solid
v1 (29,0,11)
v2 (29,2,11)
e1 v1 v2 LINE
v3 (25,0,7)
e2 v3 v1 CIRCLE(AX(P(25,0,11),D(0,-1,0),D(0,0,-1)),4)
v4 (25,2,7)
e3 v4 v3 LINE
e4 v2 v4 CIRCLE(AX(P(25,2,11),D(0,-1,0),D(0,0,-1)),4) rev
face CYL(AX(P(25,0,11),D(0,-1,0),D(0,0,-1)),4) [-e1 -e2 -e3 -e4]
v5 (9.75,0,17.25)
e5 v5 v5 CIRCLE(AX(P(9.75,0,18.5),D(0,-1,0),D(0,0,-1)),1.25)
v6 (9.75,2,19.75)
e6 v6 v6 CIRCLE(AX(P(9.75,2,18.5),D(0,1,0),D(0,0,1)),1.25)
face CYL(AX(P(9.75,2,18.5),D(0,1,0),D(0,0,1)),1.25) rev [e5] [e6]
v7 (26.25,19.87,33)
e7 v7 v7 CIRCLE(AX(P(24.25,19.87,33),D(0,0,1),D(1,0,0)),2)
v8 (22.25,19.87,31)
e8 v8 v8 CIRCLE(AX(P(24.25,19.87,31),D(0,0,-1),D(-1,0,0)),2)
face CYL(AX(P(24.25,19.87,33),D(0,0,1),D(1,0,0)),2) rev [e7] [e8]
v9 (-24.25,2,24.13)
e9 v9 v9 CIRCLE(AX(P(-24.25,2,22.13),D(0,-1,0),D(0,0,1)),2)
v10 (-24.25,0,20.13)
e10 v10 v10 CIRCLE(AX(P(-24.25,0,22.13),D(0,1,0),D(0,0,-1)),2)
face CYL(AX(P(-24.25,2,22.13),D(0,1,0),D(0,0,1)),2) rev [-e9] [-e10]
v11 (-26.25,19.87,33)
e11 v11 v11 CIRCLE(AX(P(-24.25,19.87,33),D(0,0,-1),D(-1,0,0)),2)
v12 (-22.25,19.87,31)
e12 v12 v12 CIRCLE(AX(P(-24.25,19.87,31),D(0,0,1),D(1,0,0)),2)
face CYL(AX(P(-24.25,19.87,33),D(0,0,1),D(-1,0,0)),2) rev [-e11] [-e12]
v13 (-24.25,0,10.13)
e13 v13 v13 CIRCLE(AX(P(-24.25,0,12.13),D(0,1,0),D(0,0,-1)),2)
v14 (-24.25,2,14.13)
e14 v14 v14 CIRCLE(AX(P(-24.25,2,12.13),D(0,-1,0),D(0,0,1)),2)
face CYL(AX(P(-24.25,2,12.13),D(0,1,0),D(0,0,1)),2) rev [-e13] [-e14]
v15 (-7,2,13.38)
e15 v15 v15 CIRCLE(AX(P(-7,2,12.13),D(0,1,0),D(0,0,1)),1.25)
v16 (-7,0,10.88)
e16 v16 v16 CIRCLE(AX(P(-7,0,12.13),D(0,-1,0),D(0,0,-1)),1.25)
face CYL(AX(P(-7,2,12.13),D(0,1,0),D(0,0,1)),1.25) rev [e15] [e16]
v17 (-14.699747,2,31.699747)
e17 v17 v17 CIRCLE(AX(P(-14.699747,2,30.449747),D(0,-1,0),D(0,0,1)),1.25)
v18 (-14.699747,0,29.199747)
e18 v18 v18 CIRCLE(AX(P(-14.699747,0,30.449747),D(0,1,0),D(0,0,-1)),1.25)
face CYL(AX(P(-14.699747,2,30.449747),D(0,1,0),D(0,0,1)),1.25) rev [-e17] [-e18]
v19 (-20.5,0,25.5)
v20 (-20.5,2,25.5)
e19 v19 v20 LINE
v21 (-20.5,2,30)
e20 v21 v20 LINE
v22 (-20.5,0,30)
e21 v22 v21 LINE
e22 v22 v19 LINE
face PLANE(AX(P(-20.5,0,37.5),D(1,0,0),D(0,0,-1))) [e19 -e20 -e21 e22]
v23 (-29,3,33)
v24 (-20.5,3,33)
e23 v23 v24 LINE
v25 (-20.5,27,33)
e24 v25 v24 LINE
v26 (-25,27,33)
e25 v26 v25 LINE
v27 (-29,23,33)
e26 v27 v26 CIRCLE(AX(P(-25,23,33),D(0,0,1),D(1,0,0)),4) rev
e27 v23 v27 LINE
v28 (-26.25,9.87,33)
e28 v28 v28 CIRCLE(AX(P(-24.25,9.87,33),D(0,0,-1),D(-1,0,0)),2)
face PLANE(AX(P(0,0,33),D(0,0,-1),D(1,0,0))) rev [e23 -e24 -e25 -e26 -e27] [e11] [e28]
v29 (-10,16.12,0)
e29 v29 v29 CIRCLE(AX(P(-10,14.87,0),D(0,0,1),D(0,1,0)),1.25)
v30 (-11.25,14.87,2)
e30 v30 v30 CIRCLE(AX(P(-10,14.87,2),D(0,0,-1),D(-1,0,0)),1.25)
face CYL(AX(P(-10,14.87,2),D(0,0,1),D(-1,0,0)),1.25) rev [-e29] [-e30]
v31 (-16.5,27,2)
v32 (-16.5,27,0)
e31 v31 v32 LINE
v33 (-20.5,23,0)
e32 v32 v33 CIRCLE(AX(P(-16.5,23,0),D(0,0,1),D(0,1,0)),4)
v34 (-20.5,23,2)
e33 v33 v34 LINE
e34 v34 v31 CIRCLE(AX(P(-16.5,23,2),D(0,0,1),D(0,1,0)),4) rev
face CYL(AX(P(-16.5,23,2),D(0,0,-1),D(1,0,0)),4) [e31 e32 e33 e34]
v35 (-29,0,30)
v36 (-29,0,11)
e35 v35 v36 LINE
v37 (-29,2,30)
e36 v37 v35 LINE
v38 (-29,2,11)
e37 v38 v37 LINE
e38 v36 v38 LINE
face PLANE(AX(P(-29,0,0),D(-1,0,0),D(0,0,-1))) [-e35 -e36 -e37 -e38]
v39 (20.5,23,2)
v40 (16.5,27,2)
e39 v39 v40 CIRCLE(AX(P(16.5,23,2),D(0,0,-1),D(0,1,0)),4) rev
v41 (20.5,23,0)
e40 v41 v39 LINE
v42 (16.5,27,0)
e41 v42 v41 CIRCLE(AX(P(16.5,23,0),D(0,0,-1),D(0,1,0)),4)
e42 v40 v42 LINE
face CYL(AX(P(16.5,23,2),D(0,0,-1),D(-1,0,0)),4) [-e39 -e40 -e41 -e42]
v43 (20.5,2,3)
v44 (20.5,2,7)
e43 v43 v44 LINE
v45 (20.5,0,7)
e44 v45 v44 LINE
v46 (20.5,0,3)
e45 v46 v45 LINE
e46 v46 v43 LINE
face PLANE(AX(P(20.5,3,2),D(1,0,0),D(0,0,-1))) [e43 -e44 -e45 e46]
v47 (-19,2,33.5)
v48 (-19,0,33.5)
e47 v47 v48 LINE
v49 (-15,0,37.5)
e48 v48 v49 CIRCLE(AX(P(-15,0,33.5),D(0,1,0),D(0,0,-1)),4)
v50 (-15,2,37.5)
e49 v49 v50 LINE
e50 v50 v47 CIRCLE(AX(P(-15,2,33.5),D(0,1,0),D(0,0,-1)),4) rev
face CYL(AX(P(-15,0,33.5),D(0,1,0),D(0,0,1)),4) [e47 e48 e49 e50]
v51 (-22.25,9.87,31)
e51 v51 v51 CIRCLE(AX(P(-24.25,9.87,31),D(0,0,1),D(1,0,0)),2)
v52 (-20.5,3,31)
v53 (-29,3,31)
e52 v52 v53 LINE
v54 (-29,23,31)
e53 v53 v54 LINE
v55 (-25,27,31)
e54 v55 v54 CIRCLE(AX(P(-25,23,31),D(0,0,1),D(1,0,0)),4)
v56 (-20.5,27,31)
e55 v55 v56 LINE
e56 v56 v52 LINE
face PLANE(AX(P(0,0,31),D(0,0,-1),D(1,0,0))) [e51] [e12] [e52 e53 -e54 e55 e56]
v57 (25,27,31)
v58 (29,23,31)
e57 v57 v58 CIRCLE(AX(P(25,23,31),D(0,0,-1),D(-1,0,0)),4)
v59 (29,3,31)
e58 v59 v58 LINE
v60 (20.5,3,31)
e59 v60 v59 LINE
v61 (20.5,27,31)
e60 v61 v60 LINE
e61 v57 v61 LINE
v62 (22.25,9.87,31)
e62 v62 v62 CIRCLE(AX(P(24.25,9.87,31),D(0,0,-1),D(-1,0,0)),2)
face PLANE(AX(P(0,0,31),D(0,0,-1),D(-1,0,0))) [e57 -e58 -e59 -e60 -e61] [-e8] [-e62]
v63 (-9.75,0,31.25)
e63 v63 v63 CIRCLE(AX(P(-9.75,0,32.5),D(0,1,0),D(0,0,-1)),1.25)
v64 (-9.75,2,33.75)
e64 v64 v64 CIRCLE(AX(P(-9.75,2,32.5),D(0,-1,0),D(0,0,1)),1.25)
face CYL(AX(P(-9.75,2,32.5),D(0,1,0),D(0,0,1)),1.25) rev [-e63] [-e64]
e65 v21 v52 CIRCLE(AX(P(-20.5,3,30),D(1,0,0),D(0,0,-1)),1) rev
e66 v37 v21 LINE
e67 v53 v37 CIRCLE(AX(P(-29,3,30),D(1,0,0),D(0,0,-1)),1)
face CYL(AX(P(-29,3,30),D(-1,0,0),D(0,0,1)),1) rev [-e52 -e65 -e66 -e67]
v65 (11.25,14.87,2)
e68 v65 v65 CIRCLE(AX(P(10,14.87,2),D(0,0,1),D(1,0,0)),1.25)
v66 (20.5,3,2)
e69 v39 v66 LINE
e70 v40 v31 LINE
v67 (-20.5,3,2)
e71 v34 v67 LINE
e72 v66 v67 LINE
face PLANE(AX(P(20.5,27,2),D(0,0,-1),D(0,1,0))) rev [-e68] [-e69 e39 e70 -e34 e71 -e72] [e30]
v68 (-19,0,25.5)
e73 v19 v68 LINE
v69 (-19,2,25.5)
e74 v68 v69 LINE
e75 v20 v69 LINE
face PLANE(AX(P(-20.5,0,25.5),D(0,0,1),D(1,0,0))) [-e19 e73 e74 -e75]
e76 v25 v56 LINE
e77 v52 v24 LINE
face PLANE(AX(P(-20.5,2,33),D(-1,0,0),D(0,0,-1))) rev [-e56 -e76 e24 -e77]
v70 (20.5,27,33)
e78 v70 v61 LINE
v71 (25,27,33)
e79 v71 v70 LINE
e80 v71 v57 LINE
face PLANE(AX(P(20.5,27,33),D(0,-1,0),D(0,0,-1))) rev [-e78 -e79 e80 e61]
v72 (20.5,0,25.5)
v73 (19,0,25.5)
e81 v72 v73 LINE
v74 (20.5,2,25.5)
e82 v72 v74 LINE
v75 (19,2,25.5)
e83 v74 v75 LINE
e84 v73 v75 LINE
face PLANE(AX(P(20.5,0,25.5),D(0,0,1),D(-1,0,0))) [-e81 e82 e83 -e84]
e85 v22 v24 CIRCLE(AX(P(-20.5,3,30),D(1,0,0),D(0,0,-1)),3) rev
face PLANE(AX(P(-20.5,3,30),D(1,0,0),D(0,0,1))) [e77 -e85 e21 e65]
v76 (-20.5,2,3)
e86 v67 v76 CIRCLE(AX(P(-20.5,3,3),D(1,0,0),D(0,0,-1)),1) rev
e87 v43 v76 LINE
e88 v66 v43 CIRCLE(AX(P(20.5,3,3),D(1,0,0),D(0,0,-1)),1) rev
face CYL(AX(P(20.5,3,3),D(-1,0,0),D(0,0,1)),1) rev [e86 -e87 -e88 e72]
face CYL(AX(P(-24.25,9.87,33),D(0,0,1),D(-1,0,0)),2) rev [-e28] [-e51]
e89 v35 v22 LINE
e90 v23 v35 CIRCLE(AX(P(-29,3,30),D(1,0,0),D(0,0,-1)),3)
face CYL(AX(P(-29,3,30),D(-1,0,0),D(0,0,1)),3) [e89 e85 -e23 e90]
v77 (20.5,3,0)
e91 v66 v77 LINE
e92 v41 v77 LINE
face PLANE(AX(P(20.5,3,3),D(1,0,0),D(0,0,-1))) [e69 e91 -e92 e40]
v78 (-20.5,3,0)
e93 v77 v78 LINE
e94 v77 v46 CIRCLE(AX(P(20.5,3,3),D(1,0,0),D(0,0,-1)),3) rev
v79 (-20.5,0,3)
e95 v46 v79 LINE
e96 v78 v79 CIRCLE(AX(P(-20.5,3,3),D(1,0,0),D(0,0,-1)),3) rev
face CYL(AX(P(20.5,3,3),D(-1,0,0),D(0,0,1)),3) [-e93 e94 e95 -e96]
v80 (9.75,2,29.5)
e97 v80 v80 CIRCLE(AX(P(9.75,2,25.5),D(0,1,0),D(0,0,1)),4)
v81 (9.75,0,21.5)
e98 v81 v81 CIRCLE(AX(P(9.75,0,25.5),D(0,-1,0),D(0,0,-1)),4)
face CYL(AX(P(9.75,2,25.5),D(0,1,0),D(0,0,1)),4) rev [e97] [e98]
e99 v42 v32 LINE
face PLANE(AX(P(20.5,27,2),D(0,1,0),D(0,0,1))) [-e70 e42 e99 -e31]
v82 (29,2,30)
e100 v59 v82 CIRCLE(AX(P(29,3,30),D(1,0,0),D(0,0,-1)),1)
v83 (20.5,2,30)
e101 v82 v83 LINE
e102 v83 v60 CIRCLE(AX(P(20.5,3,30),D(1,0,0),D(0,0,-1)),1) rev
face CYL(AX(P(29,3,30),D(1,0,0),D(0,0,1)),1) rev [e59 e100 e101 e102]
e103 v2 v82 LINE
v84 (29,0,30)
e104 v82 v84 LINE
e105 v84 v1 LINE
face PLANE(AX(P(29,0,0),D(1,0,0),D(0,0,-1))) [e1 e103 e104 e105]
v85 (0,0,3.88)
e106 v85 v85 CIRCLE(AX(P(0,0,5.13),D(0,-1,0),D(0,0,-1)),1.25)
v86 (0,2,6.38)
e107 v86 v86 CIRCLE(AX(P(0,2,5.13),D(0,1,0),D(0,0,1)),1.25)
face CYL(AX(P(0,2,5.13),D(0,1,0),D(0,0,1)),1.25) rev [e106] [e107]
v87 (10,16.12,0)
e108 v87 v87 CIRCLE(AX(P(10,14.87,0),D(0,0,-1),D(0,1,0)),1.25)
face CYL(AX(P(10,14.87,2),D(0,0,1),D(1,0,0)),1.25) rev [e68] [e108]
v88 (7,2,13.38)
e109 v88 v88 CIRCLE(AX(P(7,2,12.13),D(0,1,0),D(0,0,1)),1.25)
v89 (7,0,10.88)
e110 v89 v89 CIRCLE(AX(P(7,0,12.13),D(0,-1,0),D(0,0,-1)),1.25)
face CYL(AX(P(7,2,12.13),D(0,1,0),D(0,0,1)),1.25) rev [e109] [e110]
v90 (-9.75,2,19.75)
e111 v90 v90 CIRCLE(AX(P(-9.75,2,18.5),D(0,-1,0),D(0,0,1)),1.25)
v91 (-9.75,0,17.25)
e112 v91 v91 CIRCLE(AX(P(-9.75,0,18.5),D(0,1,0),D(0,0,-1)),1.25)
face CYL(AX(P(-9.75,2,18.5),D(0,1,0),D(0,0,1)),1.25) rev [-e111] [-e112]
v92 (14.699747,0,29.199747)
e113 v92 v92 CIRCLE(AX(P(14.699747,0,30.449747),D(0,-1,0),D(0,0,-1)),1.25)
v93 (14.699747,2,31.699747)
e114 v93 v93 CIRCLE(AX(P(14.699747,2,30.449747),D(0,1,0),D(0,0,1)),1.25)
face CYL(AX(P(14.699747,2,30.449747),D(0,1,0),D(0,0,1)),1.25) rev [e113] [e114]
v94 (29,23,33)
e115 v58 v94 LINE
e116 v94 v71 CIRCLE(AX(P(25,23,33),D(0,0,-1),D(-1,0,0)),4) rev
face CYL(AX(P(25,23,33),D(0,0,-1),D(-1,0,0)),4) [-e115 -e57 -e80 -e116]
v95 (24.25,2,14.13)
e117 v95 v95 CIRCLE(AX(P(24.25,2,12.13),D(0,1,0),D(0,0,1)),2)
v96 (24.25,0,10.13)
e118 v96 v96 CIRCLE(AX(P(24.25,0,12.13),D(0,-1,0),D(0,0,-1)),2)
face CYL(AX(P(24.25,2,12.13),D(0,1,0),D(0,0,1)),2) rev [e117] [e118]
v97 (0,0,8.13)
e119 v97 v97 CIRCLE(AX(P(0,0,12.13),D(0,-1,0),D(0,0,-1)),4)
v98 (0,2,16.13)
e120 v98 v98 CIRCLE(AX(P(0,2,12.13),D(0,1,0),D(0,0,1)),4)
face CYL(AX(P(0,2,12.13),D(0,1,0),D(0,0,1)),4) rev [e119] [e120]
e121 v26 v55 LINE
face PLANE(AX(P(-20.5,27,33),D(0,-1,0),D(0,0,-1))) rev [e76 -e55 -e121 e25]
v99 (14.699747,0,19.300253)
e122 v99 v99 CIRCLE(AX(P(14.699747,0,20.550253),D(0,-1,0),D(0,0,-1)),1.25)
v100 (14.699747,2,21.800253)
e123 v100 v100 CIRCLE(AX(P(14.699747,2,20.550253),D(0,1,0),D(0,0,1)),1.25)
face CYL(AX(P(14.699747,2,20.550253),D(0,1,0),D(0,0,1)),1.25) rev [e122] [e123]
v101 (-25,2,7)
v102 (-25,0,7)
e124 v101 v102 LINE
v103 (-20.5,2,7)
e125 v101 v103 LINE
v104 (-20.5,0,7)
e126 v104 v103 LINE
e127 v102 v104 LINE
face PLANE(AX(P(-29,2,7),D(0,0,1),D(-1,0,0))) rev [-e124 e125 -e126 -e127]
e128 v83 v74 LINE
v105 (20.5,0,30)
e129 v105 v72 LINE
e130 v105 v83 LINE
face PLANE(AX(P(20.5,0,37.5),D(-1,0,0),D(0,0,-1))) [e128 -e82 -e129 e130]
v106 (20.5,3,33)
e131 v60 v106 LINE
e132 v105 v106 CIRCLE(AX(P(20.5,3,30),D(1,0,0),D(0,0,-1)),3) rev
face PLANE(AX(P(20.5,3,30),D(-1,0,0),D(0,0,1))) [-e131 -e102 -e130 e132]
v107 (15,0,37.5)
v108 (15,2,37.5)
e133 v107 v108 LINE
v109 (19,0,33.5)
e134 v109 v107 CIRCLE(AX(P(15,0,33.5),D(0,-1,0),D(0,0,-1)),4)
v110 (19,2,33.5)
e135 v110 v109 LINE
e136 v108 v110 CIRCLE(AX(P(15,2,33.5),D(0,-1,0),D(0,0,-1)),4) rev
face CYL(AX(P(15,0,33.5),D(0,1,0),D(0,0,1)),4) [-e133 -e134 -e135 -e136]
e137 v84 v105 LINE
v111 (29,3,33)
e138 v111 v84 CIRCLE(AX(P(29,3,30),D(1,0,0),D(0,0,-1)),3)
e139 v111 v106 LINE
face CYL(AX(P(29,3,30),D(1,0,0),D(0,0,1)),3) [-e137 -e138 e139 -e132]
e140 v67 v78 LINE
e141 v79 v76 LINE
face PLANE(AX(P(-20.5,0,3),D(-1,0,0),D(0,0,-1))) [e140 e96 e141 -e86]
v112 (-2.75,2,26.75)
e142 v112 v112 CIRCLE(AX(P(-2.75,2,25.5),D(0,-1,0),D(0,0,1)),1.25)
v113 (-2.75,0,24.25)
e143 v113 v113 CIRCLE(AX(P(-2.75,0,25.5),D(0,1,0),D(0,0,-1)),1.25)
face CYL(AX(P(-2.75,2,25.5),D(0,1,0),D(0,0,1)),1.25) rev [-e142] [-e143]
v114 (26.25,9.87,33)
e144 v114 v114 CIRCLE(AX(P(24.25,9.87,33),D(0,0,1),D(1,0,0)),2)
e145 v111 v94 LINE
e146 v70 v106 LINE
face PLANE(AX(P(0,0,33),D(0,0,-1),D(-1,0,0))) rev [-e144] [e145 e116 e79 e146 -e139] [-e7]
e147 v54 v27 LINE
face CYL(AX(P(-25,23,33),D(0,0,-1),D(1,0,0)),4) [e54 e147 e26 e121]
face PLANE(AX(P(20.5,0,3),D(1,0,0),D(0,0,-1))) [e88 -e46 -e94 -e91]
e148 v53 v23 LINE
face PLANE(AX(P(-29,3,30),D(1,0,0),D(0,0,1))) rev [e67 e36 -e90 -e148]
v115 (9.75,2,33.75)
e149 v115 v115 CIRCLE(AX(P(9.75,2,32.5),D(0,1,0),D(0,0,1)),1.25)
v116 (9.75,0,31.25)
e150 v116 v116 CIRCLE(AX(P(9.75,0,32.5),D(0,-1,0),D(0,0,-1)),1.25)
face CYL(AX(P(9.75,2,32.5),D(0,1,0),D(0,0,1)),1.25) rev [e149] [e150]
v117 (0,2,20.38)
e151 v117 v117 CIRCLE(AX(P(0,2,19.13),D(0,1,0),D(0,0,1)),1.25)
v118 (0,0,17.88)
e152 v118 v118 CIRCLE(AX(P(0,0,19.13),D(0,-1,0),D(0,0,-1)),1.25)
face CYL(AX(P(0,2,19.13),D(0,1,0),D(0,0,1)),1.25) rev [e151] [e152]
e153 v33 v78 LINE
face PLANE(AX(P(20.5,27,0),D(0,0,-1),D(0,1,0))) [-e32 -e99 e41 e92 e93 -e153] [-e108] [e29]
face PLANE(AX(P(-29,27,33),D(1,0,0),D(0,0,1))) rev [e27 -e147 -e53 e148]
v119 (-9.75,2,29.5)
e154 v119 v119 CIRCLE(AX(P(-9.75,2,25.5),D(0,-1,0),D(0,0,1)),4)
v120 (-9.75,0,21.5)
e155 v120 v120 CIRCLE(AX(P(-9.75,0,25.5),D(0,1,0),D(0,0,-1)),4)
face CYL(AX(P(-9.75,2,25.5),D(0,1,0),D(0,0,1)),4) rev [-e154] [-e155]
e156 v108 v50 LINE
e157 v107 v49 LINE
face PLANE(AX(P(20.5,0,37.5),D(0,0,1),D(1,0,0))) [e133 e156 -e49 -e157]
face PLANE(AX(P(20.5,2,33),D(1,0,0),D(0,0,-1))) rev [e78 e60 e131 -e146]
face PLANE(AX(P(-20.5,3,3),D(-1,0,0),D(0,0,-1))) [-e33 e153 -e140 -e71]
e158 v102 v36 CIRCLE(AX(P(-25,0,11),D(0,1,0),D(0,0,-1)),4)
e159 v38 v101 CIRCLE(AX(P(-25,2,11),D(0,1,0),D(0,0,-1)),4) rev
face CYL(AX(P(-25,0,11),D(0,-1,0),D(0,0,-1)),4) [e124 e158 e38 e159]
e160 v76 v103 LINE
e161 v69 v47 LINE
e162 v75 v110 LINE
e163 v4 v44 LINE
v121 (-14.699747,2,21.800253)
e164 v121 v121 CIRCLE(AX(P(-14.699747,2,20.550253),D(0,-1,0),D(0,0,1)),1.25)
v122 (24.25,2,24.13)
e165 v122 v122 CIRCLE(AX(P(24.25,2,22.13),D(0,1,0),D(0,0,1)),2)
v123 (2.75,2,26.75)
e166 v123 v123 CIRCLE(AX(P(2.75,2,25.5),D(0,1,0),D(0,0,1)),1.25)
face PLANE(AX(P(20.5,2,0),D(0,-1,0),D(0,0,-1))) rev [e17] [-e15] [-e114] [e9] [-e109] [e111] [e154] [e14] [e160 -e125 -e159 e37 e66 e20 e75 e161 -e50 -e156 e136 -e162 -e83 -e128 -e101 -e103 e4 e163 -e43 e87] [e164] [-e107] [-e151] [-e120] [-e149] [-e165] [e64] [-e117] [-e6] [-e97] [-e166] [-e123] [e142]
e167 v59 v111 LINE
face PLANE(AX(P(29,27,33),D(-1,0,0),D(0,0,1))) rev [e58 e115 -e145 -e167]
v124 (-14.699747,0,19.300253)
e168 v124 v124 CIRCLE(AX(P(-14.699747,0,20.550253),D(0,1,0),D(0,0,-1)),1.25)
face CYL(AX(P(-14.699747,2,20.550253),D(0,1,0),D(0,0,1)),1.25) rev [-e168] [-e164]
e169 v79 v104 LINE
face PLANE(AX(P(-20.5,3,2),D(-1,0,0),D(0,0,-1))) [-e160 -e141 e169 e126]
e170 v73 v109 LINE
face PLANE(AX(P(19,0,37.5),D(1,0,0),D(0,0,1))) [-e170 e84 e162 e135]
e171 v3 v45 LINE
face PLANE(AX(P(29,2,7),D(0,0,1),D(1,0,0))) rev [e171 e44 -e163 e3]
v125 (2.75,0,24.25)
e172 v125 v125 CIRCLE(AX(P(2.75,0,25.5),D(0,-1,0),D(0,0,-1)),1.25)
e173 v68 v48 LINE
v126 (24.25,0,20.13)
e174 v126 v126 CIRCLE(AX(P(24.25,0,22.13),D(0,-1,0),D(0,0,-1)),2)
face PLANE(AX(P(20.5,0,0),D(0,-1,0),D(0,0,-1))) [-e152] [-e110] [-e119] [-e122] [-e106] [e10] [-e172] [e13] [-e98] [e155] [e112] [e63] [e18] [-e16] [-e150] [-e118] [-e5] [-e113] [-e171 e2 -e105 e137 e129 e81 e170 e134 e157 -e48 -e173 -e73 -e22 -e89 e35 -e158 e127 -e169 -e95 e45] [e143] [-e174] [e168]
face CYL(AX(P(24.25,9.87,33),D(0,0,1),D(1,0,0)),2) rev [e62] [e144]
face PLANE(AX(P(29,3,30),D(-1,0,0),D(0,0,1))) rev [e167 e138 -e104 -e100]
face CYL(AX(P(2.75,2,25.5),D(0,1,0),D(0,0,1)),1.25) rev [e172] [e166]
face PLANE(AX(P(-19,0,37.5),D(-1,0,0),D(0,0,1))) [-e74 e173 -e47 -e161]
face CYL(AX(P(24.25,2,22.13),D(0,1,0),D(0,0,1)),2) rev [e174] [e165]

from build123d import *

# Parameters (mm, degrees)
T_LE_DE_BASE_PLI_E1_DEPTH             = 20.5
ESQUISSE8_W                           = 24
ESQUISSE8_H                           = 2
BOSS_EXTRU_1_DEPTH                    = 8.5
T_LE_PLI_E_SUR_AR_TE1_STRIP_W         = 10
T_LE_PLI_E_SUR_AR_TE1_STRIP_H         = 2
T_LE_PLI_E_SUR_AR_TE1_STRIP_CUT_DEPTH = 8.5
T_LE_PLI_E_SUR_AR_TE1_DEPTH           = 8.5
ESQUISSE12_W                          = 1.5
ESQUISSE12_H                          = 12
ENL_V_MAT_EXTRU_1_DEPTH               = 8.5
DIAM_TRE_DU_PER_AGE_4_0_4_1_D         = 4
DIAM_TRE_DU_PER_AGE_8_0_8_1_D         = 8
DIAM_TRE_DU_PER_AGE_2_5_2_5_1_D       = 2.5
R_P_TITION_CIRCULAIRE1_COUNT          = 8
DIAM_TRE_DU_PER_AGE_4_0_4_2_D         = 4
DIAM_TRE_DU_PER_AGE_2_5_2_5_2_D       = 2.5
CONG_1_R                              = 4
DIAM_TRE_DU_PER_AGE_8_0_8_2_D         = 8
DIAM_TRE_DU_PER_AGE_2_5_2_5_3_D       = 2.5
R_P_TITION_CIRCULAIRE2_COUNT          = 4


# Sheet-metal steps are written as plain solids
with BuildPart() as part:
    # Esquisse1 → Tôle de base pliée1 (new body)
    with BuildSketch(Plane(origin=(0, 0, 0), x_dir=(0, 0, -1), z_dir=(1, 0, 0))):
        with BuildLine():
            Line((0, 27), (0, 3))
            ThreePointArc((0, 3), (-0.878679656, 0.878679656), (-3, 0))
            Line((-3, 0), (-37.5, 0))
            Line((-37.5, 0), (-37.5, 2))
            Line((-37.5, 2), (-3, 2))
            ThreePointArc((-3, 2), (-2.292893219, 2.292893219), (-2, 3))
            Line((-2, 3), (-2, 27))
            Line((-2, 27), (0, 27))
        make_face()
    extrude(amount=T_LE_DE_BASE_PLI_E1_DEPTH)

    # Esquisse8 → Boss.-Extru.1 (add)
    with BuildSketch(Plane(origin=(20.5, 0, 0), x_dir=(0, 0, -1), z_dir=(1, 0, 0))):
        with Locations((-19, 1)):
            Rectangle(ESQUISSE8_W, ESQUISSE8_H)
    extrude(amount=BOSS_EXTRU_1_DEPTH)

    # Tôle pliée sur arête1 strip (across the edge) → Tôle pliée sur arête1 strip cut (cut)
    with BuildSketch(Plane(origin=(20.5, 2, 31), x_dir=(0, 0, -1), z_dir=(1, 0, 0))):
        with Locations((-4, -1)):
            Rectangle(T_LE_PLI_E_SUR_AR_TE1_STRIP_W, T_LE_PLI_E_SUR_AR_TE1_STRIP_H)
    extrude(amount=T_LE_PLI_E_SUR_AR_TE1_STRIP_CUT_DEPTH, mode=Mode.SUBTRACT)

    # Tôle pliée sur arête1 section (across the edge) → Tôle pliée sur arête1 (add)
    with BuildSketch(Plane(origin=(20.5, 2, 31), x_dir=(0, 0, -1), z_dir=(1, 0, 0))):
        with BuildLine():
            Line((-2, 1), (-2, 25))
            Line((-2, 25), (0, 25))
            Line((0, 25), (0, 1))
            ThreePointArc((0, 1), (0.292893219, 0.292893219), (1, 0))
            Line((1, 0), (1, -2))
            ThreePointArc((1, -2), (-1.121320344, -1.121320344), (-2, 1))
        make_face()
    extrude(amount=T_LE_PLI_E_SUR_AR_TE1_DEPTH)

    # Esquisse12 → Enlèv. mat.-Extru.1 (cut)
    with BuildSketch(Plane(origin=(0, 2, 0), x_dir=(1, 0, 0), z_dir=(0, 1, 0))):
        with Locations((19.75, -31.5)):
            Rectangle(ESQUISSE12_W, ESQUISSE12_H)
    extrude(amount=-ENL_V_MAT_EXTRU_1_DEPTH, mode=Mode.SUBTRACT)

    # Diamètre du perçage Ø4.0 (4)1 (through all)
    with Locations(Plane(origin=(0, 2, 0), x_dir=(1, 0, 0), z_dir=(0, 1, 0))):
        with Locations((24.25, -12.13), (24.25, -22.13)):
            Hole(DIAM_TRE_DU_PER_AGE_4_0_4_1_D / 2)

    # Diamètre du perçage Ø8.0 (8)1 (through all)
    with Locations(Plane(origin=(0, 2, 0), x_dir=(1, 0, 0), z_dir=(0, 1, 0))):
        with Locations((9.75, -25.5)):
            Hole(DIAM_TRE_DU_PER_AGE_8_0_8_1_D / 2)

    # Diamètre du perçage Ø2.5 (2.5)1 (through all)
    with Locations(Plane(origin=(0, 2, 0), x_dir=(1, 0, 0), z_dir=(0, 1, 0))):
        with Locations((9.75, -18.5)):
            diam_tre_du_per_age_2_5_2_5_1 = Hole(DIAM_TRE_DU_PER_AGE_2_5_2_5_1_D / 2)

    # Répétition circulaire1: Diamètre du perçage Ø2.5 (2.5)1 ×8 about axis, 3 skipped
    r_p_tition_circulaire1_axis = Axis((9.75, 2, 25.5), (0, 1, 0))
    add([diam_tre_du_per_age_2_5_2_5_1.rotate(r_p_tition_circulaire1_axis, i * 360 / R_P_TITION_CIRCULAIRE1_COUNT) for i in range(1, R_P_TITION_CIRCULAIRE1_COUNT) if i not in (1, 3, 6)], mode=Mode.SUBTRACT)

    # Diamètre du perçage Ø4.0 (4)2 (through all)
    with Locations(Plane.XY.offset(33)):
        with Locations((24.25, 19.87), (24.25, 9.87)):
            Hole(DIAM_TRE_DU_PER_AGE_4_0_4_2_D / 2)

    # Diamètre du perçage Ø2.5 (2.5)2 (through all)
    with Locations(Plane.XY.offset(2)):
        with Locations((10, 14.87)):
            Hole(DIAM_TRE_DU_PER_AGE_2_5_2_5_2_D / 2)

    # Congé1
    cong_1_edges = [part.edges().sort_by_distance(p)[0] for p in [
        (20.5, 27, 1),
        (29, 1, 7),
        (29, 27, 32),
        (19, 1, 37.5),
    ]]
    fillet(cong_1_edges, radius=CONG_1_R)

    # Symétrie1: part across plane


with BuildPart() as part_1:
    add(part.part)
    add(part.part.mirror(Plane(origin=(0, 3, 3), x_dir=(0, 0, 1), z_dir=(1, 0, 0))))

    # Diamètre du perçage Ø8.0 (8)2 (through all)
    with Locations(Plane(origin=(0, 2, 0), x_dir=(1, 0, 0), z_dir=(0, 1, 0))):
        with Locations((0, -12.13)):
            Hole(DIAM_TRE_DU_PER_AGE_8_0_8_2_D / 2)

    # Diamètre du perçage Ø2.5 (2.5)3 (through all)
    with Locations(Plane(origin=(0, 2, 0), x_dir=(1, 0, 0), z_dir=(0, 1, 0))):
        with Locations((0, -5.13)):
            diam_tre_du_per_age_2_5_2_5_3 = Hole(DIAM_TRE_DU_PER_AGE_2_5_2_5_3_D / 2)

    # Répétition circulaire2: Diamètre du perçage Ø2.5 (2.5)3 ×4 about axis
    r_p_tition_circulaire2_axis = Axis((0, 0, 12.13), (0, 1, 0))
    for i in range(1, R_P_TITION_CIRCULAIRE2_COUNT):
        add(diam_tre_du_per_age_2_5_2_5_3.rotate(r_p_tition_circulaire2_axis, i * 360 / R_P_TITION_CIRCULAIRE2_COUNT), mode=Mode.SUBTRACT)


solid = part_1.part
